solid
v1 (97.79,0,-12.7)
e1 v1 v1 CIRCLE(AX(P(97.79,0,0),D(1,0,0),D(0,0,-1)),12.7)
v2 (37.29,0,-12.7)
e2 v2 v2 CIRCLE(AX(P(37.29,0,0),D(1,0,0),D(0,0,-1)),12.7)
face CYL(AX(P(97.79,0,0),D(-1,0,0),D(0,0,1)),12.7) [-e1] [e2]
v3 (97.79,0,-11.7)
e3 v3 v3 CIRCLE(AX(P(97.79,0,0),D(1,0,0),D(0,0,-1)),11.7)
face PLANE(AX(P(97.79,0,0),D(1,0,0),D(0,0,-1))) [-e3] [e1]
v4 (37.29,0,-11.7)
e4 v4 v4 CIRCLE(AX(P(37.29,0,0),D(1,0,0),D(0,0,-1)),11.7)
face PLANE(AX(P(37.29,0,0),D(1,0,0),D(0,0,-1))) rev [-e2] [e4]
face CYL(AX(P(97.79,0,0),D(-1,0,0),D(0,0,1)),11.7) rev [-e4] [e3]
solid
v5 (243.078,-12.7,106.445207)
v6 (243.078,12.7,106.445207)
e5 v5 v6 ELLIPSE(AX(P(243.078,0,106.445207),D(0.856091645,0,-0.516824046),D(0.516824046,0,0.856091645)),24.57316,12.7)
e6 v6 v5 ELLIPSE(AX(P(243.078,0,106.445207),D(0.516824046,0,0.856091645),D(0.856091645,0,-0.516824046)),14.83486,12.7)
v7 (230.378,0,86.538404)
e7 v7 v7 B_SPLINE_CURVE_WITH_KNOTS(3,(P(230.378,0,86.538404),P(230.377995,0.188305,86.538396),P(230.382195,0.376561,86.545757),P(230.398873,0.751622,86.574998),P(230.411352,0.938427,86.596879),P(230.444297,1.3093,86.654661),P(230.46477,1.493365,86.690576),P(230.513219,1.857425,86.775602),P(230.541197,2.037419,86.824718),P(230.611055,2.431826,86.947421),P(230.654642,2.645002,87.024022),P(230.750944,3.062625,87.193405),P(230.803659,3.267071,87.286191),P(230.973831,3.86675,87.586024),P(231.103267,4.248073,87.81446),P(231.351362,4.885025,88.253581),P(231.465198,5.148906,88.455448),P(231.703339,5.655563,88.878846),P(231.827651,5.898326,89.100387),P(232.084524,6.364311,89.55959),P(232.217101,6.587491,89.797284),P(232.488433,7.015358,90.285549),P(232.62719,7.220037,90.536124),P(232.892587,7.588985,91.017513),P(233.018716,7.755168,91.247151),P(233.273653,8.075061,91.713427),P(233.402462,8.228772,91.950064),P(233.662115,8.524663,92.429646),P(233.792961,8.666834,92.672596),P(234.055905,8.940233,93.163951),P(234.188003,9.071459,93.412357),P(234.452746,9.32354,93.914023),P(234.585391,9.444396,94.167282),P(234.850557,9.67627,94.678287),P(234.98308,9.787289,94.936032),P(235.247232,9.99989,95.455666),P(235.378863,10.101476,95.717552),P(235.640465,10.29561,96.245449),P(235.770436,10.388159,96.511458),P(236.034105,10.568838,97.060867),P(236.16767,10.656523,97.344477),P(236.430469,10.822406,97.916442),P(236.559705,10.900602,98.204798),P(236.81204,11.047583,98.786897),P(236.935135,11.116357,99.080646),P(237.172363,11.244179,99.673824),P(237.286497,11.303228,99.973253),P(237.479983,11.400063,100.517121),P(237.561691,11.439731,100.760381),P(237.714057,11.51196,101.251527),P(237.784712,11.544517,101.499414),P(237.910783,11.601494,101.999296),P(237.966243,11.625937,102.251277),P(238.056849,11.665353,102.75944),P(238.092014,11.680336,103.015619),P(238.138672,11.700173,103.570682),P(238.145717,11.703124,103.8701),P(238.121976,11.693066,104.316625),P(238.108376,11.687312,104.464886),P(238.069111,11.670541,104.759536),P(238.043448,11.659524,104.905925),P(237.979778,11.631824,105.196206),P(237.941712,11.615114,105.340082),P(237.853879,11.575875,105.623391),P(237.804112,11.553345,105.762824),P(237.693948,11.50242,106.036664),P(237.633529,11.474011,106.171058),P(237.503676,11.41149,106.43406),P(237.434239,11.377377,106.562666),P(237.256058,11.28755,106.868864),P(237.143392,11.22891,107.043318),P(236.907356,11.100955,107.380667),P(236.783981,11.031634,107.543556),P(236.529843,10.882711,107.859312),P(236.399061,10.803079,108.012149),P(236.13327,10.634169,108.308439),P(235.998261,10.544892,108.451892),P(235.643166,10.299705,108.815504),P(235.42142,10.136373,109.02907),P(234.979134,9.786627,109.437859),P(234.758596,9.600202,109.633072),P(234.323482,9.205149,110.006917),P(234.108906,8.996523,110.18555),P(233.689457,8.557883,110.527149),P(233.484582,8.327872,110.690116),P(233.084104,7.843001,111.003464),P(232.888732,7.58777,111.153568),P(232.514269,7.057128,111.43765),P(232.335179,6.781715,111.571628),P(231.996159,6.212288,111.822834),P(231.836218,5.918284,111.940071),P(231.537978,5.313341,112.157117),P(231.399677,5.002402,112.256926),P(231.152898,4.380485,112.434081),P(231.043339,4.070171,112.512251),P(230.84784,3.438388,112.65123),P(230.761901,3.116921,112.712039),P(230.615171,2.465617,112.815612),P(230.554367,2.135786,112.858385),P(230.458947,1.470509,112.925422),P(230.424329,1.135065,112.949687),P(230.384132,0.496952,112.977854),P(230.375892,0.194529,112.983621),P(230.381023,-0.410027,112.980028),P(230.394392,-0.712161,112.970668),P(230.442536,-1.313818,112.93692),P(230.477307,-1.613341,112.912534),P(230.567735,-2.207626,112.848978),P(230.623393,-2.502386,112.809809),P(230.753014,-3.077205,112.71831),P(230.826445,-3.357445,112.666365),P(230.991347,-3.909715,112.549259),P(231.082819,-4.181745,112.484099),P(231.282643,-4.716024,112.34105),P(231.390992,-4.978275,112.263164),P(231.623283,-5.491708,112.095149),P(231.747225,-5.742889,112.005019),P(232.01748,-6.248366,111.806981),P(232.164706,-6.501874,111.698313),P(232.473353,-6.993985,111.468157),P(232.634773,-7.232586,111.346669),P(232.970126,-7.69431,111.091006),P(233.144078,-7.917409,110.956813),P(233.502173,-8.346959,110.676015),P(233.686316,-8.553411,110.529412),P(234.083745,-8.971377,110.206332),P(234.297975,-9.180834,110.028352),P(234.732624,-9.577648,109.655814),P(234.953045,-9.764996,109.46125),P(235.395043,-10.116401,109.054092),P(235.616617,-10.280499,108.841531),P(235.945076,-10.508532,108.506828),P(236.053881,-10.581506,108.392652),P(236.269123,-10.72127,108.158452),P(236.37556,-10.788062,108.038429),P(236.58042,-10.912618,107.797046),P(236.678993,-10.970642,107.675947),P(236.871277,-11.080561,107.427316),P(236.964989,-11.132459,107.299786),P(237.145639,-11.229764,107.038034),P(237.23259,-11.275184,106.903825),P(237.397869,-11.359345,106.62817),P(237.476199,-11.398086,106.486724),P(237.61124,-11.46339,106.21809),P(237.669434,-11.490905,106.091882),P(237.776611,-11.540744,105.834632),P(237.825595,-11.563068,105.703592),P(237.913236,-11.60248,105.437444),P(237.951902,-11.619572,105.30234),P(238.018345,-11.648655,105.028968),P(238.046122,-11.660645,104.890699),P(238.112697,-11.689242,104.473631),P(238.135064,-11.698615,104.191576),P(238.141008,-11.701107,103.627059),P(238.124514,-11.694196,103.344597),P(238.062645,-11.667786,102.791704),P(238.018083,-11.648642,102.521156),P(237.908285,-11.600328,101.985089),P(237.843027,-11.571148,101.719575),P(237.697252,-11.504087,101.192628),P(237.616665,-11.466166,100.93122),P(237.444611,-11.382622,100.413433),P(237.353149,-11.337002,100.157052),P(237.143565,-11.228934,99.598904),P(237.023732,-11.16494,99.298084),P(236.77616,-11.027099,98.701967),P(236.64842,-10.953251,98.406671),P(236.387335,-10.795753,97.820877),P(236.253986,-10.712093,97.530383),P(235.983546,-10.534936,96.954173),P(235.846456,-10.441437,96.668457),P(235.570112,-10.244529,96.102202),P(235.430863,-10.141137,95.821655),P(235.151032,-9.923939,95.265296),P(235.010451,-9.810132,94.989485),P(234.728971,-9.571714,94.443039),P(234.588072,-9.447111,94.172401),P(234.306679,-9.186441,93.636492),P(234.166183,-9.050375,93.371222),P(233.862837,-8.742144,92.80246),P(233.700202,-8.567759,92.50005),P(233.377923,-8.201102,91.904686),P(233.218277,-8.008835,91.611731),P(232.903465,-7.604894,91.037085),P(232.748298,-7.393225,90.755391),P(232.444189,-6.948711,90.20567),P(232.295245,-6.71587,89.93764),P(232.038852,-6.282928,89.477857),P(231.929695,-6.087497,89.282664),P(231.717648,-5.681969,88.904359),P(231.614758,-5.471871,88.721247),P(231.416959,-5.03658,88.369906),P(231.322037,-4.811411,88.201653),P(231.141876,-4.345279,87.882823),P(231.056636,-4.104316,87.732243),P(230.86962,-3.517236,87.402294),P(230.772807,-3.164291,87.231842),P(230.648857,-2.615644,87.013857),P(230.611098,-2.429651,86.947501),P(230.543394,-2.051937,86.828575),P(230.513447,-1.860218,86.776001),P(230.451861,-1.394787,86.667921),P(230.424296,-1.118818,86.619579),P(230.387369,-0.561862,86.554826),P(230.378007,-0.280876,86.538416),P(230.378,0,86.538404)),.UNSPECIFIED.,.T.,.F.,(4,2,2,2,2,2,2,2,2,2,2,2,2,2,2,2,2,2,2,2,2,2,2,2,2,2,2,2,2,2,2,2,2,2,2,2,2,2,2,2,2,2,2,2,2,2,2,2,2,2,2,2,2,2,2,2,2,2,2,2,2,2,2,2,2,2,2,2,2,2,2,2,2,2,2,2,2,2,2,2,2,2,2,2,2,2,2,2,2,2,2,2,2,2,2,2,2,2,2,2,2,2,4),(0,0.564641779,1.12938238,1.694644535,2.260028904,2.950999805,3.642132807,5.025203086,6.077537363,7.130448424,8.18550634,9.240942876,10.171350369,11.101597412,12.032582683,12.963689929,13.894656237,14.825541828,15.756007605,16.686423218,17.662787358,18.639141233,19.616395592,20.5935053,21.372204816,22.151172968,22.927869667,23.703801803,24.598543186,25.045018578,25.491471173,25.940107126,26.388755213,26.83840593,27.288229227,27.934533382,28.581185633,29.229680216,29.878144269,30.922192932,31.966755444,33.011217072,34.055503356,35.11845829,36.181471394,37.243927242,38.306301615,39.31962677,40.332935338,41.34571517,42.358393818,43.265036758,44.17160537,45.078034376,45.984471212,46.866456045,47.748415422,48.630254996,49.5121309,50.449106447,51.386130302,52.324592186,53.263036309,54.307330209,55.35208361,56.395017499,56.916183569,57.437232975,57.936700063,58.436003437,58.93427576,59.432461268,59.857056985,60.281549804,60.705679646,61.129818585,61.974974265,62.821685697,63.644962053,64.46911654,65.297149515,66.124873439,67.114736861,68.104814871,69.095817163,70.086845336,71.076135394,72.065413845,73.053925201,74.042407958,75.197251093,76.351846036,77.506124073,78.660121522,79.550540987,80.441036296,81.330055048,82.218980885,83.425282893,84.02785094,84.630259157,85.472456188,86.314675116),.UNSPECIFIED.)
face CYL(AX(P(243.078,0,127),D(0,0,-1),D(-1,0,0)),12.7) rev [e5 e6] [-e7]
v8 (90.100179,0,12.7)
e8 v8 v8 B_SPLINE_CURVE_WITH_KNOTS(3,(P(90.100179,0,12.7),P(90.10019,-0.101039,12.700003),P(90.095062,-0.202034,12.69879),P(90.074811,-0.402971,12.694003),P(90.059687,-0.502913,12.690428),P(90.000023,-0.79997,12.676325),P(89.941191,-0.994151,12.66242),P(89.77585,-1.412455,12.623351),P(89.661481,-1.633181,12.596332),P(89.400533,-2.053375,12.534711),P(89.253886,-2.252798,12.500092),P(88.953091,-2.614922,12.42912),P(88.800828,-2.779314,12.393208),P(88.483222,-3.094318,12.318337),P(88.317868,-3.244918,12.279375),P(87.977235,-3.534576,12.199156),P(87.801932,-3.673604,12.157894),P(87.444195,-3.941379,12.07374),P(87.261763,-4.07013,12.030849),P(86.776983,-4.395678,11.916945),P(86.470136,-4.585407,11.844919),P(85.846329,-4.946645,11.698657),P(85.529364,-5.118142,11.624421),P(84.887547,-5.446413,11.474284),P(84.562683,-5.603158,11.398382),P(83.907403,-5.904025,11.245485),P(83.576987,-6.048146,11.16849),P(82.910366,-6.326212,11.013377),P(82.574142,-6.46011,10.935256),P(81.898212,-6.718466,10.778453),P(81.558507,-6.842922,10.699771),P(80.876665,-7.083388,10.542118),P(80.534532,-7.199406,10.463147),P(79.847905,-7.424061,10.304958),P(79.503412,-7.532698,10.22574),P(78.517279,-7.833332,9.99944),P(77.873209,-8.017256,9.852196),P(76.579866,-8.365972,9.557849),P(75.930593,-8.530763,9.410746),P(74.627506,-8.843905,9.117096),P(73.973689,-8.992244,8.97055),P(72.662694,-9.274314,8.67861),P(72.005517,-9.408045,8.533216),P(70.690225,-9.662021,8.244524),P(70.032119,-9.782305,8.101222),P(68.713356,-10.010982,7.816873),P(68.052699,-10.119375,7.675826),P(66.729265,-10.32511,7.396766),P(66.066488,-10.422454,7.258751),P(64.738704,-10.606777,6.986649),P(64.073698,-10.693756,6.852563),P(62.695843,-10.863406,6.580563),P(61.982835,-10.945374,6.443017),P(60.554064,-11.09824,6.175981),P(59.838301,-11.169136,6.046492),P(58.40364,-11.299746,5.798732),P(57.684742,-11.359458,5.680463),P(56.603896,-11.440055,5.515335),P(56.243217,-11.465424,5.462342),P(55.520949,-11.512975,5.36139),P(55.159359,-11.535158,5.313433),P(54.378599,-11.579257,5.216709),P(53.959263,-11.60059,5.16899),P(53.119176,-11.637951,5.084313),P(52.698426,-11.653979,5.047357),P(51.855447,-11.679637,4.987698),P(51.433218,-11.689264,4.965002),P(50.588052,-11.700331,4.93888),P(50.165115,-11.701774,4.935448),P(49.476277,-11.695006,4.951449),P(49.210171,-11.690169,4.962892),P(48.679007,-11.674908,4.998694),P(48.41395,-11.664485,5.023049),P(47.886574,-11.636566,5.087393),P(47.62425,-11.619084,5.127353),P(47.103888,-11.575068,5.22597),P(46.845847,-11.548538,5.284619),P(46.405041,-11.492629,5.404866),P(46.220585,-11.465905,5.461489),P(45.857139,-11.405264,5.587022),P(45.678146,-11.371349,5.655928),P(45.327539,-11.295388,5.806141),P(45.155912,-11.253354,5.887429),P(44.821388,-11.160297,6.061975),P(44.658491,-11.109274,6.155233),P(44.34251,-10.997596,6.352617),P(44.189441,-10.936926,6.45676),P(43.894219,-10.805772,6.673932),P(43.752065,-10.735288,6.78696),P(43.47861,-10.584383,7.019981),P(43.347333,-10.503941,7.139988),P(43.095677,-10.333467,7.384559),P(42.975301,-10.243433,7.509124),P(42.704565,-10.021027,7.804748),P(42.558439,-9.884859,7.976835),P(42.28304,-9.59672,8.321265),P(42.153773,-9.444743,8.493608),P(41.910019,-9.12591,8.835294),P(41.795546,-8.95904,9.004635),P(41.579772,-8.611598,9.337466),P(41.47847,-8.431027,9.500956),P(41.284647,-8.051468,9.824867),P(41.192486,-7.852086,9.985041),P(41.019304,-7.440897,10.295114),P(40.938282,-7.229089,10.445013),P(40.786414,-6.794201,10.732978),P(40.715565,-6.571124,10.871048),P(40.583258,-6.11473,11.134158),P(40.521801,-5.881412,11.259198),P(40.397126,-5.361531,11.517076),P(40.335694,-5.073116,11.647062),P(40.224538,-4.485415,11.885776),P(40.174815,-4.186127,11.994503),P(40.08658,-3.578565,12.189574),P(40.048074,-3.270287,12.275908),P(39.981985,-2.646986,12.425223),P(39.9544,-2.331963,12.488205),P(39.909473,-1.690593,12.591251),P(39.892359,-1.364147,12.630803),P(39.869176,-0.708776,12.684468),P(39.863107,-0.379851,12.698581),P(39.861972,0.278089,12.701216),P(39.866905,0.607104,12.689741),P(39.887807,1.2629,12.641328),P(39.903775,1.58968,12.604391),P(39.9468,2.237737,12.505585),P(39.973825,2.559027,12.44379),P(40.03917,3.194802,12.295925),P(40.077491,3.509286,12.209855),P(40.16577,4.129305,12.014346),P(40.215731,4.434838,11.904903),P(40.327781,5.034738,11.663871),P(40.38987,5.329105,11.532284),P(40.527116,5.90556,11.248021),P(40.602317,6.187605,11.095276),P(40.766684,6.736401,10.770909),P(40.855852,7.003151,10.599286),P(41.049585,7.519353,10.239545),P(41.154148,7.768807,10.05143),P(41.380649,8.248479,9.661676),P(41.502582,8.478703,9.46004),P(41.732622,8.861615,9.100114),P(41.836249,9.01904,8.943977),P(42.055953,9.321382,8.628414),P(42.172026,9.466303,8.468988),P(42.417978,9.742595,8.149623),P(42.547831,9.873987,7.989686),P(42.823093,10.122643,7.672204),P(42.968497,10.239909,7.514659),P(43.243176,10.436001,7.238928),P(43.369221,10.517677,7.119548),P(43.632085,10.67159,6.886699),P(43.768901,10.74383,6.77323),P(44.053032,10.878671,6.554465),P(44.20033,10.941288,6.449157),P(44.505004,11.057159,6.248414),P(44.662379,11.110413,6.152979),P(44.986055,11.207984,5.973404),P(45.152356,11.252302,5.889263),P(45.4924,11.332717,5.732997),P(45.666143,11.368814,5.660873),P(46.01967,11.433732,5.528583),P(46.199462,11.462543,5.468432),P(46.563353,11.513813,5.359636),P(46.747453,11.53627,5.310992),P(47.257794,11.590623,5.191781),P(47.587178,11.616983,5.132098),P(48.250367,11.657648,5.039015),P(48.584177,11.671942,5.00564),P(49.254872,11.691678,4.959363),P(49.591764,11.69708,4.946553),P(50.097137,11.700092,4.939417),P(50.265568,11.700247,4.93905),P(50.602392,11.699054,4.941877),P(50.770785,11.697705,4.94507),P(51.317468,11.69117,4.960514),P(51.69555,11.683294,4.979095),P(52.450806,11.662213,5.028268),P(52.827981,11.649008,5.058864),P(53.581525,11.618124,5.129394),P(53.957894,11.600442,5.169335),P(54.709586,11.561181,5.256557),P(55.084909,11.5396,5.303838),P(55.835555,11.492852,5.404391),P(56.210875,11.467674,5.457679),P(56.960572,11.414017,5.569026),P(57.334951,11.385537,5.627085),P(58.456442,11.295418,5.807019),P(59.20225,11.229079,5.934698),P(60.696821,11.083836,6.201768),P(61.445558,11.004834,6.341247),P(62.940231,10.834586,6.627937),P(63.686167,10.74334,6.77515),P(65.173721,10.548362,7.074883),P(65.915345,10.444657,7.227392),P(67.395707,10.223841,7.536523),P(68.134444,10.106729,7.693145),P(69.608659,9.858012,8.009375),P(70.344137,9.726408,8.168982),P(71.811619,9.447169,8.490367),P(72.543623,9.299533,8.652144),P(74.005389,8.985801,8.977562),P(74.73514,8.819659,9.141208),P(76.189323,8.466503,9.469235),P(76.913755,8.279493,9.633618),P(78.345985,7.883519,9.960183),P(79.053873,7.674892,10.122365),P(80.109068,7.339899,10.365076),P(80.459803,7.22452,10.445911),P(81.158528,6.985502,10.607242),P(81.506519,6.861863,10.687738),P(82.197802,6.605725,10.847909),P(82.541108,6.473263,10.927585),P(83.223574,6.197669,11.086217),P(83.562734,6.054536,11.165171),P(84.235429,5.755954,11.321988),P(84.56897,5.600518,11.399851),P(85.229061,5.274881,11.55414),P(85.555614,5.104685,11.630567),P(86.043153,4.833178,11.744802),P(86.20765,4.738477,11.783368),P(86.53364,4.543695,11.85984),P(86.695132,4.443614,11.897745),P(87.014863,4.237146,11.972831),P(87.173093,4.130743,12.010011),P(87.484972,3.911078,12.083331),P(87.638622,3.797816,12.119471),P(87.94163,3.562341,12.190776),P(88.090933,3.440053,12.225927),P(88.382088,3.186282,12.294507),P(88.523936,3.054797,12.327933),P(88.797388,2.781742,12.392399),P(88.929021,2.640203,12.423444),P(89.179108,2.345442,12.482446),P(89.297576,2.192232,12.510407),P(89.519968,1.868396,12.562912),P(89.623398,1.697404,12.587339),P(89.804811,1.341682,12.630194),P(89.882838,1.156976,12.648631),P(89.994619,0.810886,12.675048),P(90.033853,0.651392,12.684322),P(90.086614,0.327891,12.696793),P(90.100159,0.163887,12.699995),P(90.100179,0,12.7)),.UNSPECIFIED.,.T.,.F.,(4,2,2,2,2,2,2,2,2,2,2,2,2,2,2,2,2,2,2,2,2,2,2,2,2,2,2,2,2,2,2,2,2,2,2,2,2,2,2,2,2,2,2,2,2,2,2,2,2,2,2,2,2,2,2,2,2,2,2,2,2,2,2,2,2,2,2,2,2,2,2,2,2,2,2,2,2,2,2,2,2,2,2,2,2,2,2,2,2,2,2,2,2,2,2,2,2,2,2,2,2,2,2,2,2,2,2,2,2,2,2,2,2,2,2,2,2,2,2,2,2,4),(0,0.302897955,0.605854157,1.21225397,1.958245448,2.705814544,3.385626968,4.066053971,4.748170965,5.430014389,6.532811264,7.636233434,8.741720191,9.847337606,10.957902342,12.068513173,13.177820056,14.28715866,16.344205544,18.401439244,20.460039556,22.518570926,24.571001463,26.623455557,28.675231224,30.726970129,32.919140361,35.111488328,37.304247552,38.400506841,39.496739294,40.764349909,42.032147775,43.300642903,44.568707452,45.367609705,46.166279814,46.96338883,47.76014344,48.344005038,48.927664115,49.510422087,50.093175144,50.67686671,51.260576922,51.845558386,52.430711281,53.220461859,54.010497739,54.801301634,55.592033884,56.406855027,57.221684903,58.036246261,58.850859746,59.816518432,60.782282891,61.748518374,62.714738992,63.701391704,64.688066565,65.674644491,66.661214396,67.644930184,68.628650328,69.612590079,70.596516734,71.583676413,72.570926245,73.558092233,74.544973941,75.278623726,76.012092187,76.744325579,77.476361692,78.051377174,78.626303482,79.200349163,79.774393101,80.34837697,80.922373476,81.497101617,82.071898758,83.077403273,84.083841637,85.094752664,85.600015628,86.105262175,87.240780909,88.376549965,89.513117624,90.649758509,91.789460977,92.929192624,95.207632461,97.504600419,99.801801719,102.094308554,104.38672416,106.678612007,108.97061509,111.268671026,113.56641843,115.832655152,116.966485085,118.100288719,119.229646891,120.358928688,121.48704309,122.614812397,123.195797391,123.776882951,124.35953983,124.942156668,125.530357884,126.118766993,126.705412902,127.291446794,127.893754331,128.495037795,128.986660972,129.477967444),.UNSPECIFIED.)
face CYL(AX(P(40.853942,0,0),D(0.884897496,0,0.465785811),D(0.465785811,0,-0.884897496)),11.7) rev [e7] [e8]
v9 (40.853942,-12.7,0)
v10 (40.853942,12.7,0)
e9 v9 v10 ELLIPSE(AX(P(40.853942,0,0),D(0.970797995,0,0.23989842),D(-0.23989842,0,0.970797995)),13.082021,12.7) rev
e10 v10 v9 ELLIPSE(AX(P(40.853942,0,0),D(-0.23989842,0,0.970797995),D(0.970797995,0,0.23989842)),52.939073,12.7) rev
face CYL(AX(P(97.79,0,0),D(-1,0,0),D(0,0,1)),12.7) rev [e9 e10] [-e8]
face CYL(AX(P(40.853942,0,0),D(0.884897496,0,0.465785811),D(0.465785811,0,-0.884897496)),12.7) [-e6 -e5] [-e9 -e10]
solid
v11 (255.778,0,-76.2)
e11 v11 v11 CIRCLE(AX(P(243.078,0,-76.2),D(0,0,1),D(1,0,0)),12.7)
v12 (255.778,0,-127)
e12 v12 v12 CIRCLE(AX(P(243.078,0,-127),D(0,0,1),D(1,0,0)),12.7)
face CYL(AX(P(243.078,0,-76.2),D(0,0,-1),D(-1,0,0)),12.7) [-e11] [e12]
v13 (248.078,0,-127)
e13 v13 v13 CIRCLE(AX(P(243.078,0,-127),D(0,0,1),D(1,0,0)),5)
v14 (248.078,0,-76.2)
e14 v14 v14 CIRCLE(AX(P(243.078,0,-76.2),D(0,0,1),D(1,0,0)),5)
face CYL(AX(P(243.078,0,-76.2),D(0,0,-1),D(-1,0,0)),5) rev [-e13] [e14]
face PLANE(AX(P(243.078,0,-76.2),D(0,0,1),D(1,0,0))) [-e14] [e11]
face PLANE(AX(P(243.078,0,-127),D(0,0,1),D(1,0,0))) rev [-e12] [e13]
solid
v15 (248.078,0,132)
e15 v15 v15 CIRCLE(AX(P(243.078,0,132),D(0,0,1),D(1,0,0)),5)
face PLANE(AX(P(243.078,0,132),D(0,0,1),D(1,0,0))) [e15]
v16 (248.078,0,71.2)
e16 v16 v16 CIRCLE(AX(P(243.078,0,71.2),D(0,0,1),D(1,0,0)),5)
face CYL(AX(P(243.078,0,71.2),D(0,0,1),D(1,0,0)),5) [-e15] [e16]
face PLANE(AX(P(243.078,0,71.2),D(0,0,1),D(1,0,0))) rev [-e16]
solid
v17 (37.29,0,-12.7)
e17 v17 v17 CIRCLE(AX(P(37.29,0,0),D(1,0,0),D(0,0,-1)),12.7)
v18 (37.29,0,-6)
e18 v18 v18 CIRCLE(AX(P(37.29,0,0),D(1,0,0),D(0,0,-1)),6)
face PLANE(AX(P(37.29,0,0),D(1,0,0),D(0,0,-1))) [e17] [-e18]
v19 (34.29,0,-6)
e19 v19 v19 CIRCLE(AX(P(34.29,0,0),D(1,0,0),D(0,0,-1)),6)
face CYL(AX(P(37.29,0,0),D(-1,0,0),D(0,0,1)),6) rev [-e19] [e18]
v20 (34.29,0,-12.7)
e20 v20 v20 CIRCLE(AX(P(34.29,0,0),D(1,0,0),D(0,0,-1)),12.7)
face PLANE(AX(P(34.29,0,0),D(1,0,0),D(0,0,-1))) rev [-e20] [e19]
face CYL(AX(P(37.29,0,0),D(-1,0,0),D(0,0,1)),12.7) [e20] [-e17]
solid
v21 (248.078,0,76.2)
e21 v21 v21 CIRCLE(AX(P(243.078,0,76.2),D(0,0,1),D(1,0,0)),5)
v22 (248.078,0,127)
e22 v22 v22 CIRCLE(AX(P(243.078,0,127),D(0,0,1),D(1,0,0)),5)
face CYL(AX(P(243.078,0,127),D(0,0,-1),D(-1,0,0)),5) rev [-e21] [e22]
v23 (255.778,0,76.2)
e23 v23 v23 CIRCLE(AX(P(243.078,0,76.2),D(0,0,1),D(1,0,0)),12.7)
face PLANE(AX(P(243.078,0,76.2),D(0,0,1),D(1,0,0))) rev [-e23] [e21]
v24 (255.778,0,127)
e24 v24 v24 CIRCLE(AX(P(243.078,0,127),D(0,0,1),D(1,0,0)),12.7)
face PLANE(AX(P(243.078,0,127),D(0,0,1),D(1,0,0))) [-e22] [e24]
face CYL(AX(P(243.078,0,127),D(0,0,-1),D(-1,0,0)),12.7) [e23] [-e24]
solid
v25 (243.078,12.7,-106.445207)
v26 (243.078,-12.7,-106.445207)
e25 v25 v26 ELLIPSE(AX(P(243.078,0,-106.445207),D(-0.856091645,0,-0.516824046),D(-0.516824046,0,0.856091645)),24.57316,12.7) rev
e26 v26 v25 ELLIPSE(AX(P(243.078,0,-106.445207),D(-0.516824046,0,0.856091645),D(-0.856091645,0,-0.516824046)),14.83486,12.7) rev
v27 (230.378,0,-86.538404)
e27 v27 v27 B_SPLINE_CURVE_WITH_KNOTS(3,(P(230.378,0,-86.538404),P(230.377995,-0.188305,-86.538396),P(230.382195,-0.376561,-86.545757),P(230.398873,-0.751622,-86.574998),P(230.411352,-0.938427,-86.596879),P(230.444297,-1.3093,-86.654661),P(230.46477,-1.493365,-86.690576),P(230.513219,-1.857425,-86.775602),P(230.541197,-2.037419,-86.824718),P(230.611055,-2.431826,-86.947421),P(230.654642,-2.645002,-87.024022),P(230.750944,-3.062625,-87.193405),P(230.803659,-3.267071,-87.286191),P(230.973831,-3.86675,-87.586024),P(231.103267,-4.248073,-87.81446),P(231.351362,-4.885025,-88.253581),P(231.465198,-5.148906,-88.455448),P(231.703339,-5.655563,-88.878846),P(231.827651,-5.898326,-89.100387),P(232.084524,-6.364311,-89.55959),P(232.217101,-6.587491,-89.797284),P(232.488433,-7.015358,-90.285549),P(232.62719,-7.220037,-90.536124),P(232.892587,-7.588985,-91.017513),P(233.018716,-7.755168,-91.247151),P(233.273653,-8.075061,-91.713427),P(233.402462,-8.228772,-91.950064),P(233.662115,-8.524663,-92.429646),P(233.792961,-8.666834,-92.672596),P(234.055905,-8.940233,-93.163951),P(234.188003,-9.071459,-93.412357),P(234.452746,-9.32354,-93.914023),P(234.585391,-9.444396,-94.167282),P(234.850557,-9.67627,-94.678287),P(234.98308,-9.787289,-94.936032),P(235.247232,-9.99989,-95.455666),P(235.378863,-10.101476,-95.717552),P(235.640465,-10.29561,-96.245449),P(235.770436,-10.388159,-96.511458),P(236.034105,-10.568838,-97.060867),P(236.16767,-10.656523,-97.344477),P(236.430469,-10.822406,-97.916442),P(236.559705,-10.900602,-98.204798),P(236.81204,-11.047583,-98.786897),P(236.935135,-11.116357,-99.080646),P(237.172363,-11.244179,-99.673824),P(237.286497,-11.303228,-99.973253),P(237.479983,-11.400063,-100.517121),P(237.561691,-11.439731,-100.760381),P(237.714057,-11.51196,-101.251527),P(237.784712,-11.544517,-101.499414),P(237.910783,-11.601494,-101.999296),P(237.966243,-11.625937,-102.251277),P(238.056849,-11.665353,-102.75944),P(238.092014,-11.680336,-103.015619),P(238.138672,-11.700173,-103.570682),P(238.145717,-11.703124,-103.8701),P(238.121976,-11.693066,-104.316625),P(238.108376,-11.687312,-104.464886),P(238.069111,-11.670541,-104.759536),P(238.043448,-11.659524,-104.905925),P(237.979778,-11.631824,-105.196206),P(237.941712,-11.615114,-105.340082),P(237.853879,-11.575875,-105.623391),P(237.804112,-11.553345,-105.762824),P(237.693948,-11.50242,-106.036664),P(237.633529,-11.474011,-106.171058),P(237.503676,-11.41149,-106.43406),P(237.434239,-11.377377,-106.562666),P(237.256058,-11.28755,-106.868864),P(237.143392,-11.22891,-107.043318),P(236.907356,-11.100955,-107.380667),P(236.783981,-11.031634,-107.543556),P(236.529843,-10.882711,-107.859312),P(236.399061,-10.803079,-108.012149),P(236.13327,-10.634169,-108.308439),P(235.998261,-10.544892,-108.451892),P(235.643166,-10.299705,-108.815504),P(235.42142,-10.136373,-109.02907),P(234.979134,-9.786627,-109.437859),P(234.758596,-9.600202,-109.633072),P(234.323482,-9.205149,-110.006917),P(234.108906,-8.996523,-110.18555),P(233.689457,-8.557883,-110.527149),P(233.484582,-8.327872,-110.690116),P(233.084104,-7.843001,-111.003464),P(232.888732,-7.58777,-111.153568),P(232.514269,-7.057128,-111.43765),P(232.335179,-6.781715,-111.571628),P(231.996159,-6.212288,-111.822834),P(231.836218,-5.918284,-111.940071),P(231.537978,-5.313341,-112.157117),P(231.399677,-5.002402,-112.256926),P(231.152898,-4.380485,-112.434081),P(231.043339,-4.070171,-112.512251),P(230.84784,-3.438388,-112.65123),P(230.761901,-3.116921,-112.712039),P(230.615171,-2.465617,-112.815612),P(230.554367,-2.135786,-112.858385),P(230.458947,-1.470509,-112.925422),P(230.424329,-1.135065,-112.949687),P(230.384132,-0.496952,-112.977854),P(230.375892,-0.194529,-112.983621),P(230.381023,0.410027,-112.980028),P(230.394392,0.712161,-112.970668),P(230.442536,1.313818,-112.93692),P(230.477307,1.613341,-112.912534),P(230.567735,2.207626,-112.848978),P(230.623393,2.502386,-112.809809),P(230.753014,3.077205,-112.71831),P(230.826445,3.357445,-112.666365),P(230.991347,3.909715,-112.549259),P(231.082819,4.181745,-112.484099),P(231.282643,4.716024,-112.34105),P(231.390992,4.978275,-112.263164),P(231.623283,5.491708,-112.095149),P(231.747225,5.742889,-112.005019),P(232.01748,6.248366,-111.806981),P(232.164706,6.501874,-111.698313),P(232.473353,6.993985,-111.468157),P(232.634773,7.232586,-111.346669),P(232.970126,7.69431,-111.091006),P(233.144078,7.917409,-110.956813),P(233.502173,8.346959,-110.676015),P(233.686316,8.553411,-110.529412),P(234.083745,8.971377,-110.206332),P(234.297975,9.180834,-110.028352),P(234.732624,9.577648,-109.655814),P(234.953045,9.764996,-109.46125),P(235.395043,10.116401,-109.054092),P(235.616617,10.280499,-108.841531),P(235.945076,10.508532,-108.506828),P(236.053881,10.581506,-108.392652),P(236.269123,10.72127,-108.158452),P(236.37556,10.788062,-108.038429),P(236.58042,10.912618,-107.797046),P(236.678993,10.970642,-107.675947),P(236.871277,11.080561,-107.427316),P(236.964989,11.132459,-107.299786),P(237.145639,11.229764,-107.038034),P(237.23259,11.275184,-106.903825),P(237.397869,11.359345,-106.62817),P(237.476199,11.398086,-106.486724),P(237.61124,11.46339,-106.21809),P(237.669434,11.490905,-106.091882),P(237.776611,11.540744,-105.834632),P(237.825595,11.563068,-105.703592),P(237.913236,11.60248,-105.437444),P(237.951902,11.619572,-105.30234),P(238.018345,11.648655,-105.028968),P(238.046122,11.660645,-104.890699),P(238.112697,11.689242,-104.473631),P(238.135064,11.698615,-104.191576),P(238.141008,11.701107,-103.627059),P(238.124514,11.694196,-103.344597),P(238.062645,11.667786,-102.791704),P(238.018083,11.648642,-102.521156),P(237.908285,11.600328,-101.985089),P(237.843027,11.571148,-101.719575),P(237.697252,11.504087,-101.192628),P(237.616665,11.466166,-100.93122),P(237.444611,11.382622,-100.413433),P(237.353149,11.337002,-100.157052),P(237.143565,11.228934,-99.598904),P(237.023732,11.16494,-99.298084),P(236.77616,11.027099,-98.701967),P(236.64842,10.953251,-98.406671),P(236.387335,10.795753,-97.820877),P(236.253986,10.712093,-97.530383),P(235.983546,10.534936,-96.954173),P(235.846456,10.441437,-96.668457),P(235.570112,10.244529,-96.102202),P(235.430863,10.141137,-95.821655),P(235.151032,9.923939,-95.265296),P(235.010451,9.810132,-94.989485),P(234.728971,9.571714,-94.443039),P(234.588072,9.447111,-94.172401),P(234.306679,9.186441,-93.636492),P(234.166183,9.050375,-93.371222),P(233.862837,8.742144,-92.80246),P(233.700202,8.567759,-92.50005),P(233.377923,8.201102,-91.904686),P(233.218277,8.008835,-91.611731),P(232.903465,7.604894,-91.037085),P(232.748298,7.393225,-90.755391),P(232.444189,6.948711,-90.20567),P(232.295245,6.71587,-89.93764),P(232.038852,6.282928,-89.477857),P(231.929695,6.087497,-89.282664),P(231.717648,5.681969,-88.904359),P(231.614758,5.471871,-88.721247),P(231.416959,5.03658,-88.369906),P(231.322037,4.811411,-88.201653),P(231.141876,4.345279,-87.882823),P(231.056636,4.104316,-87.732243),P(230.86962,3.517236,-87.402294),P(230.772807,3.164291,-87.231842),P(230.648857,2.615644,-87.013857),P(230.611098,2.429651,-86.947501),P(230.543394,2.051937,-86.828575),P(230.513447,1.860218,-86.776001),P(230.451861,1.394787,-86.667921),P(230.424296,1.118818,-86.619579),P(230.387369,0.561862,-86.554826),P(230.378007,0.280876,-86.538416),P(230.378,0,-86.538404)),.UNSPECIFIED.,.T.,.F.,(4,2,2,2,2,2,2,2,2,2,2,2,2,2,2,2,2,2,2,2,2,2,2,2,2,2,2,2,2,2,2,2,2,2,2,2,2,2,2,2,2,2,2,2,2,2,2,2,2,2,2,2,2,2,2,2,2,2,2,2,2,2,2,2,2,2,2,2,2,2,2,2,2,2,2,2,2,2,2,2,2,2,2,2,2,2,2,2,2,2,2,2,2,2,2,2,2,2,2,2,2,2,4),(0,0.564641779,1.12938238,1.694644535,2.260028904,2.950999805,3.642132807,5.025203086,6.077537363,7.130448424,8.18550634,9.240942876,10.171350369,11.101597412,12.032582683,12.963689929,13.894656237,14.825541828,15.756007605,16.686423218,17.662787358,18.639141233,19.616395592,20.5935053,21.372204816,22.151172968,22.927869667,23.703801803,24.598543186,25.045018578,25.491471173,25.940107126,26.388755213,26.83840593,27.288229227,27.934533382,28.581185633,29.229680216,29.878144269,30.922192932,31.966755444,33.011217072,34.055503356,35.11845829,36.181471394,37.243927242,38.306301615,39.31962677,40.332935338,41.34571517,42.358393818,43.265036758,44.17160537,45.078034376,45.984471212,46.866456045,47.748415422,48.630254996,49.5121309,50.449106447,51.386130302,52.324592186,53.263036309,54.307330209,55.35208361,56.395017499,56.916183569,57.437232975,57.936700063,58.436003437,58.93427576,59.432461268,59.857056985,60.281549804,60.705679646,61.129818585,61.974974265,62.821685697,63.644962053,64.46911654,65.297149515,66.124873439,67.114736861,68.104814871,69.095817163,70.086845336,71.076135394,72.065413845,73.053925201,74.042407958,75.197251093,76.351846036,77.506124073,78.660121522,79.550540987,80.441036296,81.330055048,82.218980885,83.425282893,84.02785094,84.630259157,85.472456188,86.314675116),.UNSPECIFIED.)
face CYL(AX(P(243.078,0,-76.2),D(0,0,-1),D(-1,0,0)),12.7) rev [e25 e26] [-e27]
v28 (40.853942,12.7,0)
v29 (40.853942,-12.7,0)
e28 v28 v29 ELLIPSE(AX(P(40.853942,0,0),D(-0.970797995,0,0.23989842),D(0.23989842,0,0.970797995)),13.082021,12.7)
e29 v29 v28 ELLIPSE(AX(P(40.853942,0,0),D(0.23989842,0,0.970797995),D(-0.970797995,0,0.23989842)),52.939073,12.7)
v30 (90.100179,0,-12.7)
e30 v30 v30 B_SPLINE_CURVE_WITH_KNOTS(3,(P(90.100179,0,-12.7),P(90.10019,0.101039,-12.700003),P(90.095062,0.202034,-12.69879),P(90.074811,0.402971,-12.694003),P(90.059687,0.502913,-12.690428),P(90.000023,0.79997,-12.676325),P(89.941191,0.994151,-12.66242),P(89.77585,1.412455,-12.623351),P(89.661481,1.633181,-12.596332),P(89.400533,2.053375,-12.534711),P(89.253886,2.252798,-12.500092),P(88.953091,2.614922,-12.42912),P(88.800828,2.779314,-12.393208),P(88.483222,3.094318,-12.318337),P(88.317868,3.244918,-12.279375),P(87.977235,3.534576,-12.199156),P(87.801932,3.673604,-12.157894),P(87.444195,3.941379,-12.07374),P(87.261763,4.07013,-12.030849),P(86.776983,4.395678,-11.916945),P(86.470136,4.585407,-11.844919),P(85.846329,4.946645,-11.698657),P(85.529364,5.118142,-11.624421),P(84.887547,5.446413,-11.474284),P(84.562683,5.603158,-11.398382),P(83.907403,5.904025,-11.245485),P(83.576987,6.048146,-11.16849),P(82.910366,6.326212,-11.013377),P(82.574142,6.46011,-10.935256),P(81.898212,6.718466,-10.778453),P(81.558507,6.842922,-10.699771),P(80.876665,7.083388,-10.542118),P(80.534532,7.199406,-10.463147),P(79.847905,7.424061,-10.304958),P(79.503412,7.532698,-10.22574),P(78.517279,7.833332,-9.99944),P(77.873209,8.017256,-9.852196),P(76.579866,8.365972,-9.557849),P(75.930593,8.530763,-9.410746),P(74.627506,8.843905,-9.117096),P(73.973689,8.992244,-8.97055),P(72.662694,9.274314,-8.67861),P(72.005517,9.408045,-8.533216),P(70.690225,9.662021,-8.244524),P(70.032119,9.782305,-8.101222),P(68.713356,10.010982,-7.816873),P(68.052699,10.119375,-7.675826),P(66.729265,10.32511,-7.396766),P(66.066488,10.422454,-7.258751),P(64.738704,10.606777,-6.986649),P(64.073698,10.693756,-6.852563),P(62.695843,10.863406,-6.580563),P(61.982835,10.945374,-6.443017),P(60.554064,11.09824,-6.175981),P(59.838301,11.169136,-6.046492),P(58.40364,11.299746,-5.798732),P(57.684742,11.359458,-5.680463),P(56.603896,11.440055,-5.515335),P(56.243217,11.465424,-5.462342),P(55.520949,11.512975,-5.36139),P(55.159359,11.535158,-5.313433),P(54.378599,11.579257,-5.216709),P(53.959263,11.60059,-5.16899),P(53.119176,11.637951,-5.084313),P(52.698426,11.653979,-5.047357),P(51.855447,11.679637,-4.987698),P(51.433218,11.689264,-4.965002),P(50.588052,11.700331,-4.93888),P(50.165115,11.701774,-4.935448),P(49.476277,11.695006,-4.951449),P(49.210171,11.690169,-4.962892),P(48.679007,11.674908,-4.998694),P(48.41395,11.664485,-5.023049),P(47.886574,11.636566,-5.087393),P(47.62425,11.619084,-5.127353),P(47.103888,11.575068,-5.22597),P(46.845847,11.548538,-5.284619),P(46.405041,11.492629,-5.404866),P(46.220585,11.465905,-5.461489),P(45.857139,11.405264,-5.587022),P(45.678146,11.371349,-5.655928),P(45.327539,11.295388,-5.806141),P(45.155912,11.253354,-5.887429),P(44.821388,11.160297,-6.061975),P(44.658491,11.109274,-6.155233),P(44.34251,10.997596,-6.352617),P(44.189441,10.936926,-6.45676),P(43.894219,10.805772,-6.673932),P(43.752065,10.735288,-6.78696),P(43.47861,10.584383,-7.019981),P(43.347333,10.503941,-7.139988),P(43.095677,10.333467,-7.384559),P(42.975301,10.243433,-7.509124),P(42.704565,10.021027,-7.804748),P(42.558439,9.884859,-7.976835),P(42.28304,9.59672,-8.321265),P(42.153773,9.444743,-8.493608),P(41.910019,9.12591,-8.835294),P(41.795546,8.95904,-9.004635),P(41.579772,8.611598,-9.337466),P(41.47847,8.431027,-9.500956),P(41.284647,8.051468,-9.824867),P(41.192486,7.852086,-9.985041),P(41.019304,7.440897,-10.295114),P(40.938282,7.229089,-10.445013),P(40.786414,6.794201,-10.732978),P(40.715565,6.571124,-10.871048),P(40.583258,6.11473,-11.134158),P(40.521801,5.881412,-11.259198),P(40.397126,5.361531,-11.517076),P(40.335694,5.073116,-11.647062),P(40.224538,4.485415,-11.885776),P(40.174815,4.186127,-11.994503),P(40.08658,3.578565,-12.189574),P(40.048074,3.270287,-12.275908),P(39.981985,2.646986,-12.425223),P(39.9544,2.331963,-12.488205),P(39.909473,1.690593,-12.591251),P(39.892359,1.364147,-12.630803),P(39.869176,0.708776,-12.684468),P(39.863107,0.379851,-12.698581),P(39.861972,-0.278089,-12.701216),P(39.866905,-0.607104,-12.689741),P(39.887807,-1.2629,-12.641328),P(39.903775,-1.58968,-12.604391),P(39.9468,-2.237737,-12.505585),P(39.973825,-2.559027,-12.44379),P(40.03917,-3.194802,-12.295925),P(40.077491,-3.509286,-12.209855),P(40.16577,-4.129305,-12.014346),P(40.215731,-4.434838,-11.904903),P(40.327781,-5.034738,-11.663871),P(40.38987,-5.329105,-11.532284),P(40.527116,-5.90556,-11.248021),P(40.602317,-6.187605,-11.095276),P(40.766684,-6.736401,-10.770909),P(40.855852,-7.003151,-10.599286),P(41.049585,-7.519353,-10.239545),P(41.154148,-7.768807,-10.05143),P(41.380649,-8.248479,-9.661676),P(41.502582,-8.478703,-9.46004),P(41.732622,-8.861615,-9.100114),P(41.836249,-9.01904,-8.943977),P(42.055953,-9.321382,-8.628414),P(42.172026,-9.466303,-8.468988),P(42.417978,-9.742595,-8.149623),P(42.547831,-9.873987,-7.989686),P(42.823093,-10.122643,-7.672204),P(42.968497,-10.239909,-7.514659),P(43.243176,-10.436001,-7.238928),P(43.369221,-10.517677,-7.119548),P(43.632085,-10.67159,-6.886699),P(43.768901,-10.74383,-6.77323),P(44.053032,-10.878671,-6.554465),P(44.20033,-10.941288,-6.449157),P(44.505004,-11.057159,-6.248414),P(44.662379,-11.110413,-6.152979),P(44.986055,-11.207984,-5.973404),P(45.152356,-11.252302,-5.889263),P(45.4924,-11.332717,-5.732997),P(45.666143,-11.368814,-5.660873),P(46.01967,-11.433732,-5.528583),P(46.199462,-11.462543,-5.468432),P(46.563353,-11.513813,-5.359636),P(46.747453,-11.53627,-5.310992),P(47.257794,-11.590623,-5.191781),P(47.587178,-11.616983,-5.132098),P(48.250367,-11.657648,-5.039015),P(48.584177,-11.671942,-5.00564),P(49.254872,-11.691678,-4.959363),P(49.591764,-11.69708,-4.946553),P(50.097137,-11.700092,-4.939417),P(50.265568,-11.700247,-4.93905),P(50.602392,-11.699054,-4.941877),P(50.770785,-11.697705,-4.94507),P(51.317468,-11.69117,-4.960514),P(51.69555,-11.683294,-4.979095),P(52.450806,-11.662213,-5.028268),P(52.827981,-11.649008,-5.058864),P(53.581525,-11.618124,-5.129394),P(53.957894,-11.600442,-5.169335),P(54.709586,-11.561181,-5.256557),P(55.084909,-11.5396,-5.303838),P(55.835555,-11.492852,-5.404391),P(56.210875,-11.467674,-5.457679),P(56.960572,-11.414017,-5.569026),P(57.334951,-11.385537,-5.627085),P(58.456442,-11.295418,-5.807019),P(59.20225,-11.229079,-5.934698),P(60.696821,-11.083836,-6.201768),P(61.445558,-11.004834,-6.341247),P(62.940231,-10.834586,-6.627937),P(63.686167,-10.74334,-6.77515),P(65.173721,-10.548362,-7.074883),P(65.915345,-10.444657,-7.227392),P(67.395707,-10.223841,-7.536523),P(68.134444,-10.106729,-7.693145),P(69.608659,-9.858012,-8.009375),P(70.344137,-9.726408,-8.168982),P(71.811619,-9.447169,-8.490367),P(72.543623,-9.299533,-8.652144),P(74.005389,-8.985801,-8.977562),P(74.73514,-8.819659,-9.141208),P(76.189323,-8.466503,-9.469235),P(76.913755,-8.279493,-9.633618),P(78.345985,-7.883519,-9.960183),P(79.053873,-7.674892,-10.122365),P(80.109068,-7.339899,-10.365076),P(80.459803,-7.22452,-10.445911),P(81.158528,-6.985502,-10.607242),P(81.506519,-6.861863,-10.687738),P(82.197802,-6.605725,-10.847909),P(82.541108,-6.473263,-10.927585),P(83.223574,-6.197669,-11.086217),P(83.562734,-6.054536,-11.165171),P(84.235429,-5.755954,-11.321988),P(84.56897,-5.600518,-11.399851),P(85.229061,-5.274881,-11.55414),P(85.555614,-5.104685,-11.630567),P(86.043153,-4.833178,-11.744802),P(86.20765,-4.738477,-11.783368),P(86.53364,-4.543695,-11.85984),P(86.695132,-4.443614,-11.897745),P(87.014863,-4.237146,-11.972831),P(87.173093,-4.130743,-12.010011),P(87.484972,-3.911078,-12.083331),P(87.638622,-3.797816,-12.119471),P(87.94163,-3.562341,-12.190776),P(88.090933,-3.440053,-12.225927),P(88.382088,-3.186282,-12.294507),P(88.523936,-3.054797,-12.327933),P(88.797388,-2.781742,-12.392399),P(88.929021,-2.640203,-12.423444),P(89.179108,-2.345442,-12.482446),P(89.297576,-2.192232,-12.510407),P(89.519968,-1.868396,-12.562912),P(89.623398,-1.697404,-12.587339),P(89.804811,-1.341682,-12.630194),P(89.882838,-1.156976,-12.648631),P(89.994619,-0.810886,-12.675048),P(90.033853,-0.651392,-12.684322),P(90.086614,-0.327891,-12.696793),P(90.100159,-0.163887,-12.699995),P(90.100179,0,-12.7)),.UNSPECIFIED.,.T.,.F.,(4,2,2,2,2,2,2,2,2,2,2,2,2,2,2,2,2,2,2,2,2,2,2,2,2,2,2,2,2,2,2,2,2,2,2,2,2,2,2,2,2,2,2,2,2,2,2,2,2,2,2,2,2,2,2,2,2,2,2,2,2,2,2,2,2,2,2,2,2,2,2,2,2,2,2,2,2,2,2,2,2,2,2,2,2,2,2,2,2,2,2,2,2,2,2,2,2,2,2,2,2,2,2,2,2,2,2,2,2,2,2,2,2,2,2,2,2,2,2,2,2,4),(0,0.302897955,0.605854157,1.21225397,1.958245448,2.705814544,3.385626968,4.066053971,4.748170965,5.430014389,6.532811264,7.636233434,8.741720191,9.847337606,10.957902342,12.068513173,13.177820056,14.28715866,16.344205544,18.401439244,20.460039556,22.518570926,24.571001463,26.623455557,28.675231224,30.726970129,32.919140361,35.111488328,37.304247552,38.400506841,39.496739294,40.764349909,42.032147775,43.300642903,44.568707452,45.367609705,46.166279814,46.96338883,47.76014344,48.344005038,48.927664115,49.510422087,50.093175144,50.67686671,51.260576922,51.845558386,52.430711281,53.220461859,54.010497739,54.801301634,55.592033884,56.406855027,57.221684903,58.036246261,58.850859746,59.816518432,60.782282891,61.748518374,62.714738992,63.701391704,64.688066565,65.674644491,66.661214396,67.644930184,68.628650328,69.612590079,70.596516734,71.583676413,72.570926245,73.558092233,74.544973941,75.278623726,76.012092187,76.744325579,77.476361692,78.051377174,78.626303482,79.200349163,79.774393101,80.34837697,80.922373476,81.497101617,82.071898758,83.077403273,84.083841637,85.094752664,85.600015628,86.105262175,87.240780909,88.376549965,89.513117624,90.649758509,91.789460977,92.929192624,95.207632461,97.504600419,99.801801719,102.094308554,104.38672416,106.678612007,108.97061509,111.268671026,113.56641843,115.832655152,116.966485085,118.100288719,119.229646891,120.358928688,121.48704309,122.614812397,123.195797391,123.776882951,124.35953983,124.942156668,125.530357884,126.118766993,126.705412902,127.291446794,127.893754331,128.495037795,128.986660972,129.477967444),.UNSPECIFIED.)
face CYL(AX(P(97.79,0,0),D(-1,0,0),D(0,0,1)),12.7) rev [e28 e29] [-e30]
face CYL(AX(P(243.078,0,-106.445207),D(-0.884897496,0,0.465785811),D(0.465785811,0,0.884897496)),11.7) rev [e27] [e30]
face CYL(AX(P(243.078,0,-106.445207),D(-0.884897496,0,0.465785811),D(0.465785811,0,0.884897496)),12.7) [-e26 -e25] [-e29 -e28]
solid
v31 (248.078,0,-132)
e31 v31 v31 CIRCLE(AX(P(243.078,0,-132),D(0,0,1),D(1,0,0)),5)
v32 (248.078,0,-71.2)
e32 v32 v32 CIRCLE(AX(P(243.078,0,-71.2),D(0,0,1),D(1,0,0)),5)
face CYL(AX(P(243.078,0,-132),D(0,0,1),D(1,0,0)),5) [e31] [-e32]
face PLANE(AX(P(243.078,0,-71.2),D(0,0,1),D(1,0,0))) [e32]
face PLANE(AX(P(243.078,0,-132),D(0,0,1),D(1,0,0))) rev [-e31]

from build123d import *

# Parameters (mm, degrees)
ONEINCH_START                          = 87.544697124
ONEINCH_PIPE_ONE_INCH_1_OUTLINE_R      = 12.7
ONEINCH_PIPE_ONE_INCH_1_OUTLINE_R_2    = 11.7
ONEINCH_PIPE_ONE_INCH_1_DEPTH          = 156.098206181
ONEINCH_START_2                        = 36.151550895
ONEINCH_PIPE_ONE_INCH_1_2_OUTLINE_R    = 12.7
ONEINCH_PIPE_ONE_INCH_1_2_OUTLINE_R_2  = 11.7
ONEINCH_PIPE_ONE_INCH_1_2_DEPTH        = 228.528229631
ONEINCH_START_3                        = -11.238198245
ONEINCH_PIPE_ONE_INCH_1_3_DEPTH        = 14.210948616
ONEINCH_START_4                        = 2.972750371
ONEINCH_PIPE_ONE_INCH_1_4_DEPTH        = 114.710654538
ONEINCH_START_5                        = 34.938462135
ONEINCH_PIPE_ONE_INCH_1_5_DEPTH        = 213.589231941
ONEINCH_PIPE_ONE_INCH_1_6_OUTLINE_R    = 12.7
ONEINCH_PIPE_ONE_INCH_1_6_OUTLINE_R_2  = 11.7
ONEINCH_PIPE_ONE_INCH_1_6_DEPTH        = 156.098206181
ONEINCH_PIPE_ONE_INCH_1_7_OUTLINE_R    = 12.7
ONEINCH_PIPE_ONE_INCH_1_7_OUTLINE_R_2  = 11.7
ONEINCH_PIPE_ONE_INCH_1_7_DEPTH        = 228.528229631
ONEINCH_START_6                        = -2.972750371
ONEINCH_PIPE_ONE_INCH_1_8_DEPTH        = 14.210948616
ONEINCH_START_7                        = -117.683404909
ONEINCH_PIPE_ONE_INCH_1_9_DEPTH        = 114.710654538
ONEINCH_PIPE_ONE_INCH_1_10_DEPTH       = 213.589231941
ONEINCH_START_8                        = 37.29
ONEINCH_PIPE_ONE_INCH_1_11_OUTLINE_R   = 12.7
ONEINCH_PIPE_ONE_INCH_1_11_OUTLINE_R_2 = 11.7
ONEINCH_PIPE_ONE_INCH_1_11_DEPTH       = 60.5
ONEINCH_START_9                        = 76.2
ONEINCH_PIPE_ONE_INCH_1_12_OUTLINE_R   = 12.7
ONEINCH_PIPE_ONE_INCH_1_12_OUTLINE_R_2 = 11.7
ONEINCH_PIPE_ONE_INCH_1_12_DEPTH       = 50.8
ONEINCH_START_10                       = -127
ONEINCH_PIPE_ONE_INCH_1_13_OUTLINE_R   = 12.7
ONEINCH_PIPE_ONE_INCH_1_13_OUTLINE_R_2 = 11.7
ONEINCH_PIPE_ONE_INCH_1_13_DEPTH       = 50.8
SKETCH16_R                             = 12.7
SKETCH16_R_2                           = 6
WASHERS_ONEINCHDIA12MM_1_DEPTH         = 3
SKETCH110_R                            = 12.7
SKETCH110_R_2                          = 5
SUSPENSIONMOUNT_BUSHING10MM_1_DEPTH    = 50.8
SKETCH110_ON_SEGMENT_2_R               = 12.7
SKETCH110_ON_SEGMENT_2_R_2             = 5
SUSPENSIONMOUNT_BUSHING10MM_1_2_DEPTH  = 50.8
BOSS_EXTRUDE1_DEPTH                    = 5
BOSS_EXTRUDE1_DEPTH_BACK               = 55.8
SKETCH112_R                            = 5
BOSS_EXTRUDE2_DEPTH                    = 5
BOSS_EXTRUDE2_DEPTH_BACK               = 55.8
SKETCH111_R                            = 5


with BuildPart() as part:
    # Oneinch PIPE_ONE_INCH(1): read off the stored shape, not the designer's step
    # Oneinch PIPE_ONE_INCH(1) outline → Oneinch PIPE_ONE_INCH(1) (new body)
    with BuildSketch(Plane(origin=(0, 0, 0), x_dir=(0.4657858109212566, 0, -0.8848974959533038), z_dir=(0.8848974959533038, 0, 0.46578581092125687)).offset(ONEINCH_START)):
        with Locations((19.029186514, 0)):
            Circle(ONEINCH_PIPE_ONE_INCH_1_OUTLINE_R)
        with Locations((19.029186514, 0)):
            Circle(ONEINCH_PIPE_ONE_INCH_1_OUTLINE_R_2, mode=Mode.SUBTRACT)
    extrude(amount=ONEINCH_PIPE_ONE_INCH_1_DEPTH)

    # Oneinch PIPE_ONE_INCH_1 2 outline → Oneinch PIPE_ONE_INCH_1 2 (add)
    with BuildSketch(Plane(origin=(0, 0, 0), x_dir=(0.4657858109212566, 0, -0.8848974959533038), z_dir=(0.8848974959533038, 0, 0.46578581092125687)).offset(ONEINCH_START_2)):
        with Locations((19.029186514, 0)):
            Circle(ONEINCH_PIPE_ONE_INCH_1_2_OUTLINE_R)
        with Locations((19.029186514, 0)):
            Circle(ONEINCH_PIPE_ONE_INCH_1_2_OUTLINE_R_2, mode=Mode.SUBTRACT)
    extrude(amount=ONEINCH_PIPE_ONE_INCH_1_2_DEPTH)

    # Oneinch PIPE_ONE_INCH_1 3 outline → Oneinch PIPE_ONE_INCH_1 3 (cut)
    with BuildSketch(Plane.XY.offset(ONEINCH_START_3)):
        with BuildLine():
            Line((250, -12.7), (243.078, -12.7))
            ThreePointArc((243.078, -12.7), (230.378, 0), (243.078, 12.7))
            Line((243.078, 12.7), (250, 12.7))
            Line((250, 12.7), (250, 14))
            Line((250, 14), (65, 14))
            Line((65, 14), (65, -14))
            Line((65, -14), (250, -14))
            Line((250, -14), (250, -12.7))
        make_face()
    extrude(amount=ONEINCH_PIPE_ONE_INCH_1_3_DEPTH, mode=Mode.SUBTRACT)

    # Oneinch PIPE_ONE_INCH_1 4 outline → Oneinch PIPE_ONE_INCH_1 4 (cut)
    with BuildSketch(Plane.XY.offset(ONEINCH_START_4)):
        with BuildLine():
            ThreePointArc((243.078, 12.7), (230.378, 0), (243.078, -12.7))
            Line((243.078, -12.7), (250, -12.7))
            Line((250, -12.7), (250, 12.7))
            Line((250, 12.7), (243.078, 12.7))
        make_face()
    extrude(amount=ONEINCH_PIPE_ONE_INCH_1_4_DEPTH, mode=Mode.SUBTRACT)

    # Oneinch PIPE_ONE_INCH_1 5 outline → Oneinch PIPE_ONE_INCH_1 5 (cut)
    with BuildSketch(Plane.YZ.offset(ONEINCH_START_5)):
        with BuildLine():
            ThreePointArc((12.7, 0), (0, 12.7), (-12.7, 0))
            Line((-12.7, 0), (-12.7, -13))
            Line((-12.7, -13), (12.7, -13))
            Line((12.7, -13), (12.7, 0))
        make_face()
    extrude(amount=ONEINCH_PIPE_ONE_INCH_1_5_DEPTH, mode=Mode.SUBTRACT)


with BuildPart() as body_2:
    # Oneinch PIPE_ONE_INCH_1 6 outline → Oneinch PIPE_ONE_INCH_1 6 (new body)
    with BuildSketch(Plane(origin=(0, 0, 0), x_dir=(0.4657858109212566, 0, 0.8848974959533038), z_dir=(0.8848974959533038, 0, -0.46578581092125687)).offset(ONEINCH_START)):
        with Locations((19.029186514, 0)):
            Circle(ONEINCH_PIPE_ONE_INCH_1_6_OUTLINE_R)
        with Locations((19.029186514, 0)):
            Circle(ONEINCH_PIPE_ONE_INCH_1_6_OUTLINE_R_2, mode=Mode.SUBTRACT)
    extrude(amount=ONEINCH_PIPE_ONE_INCH_1_6_DEPTH)

    # Oneinch PIPE_ONE_INCH_1 7 outline → Oneinch PIPE_ONE_INCH_1 7 (add)
    with BuildSketch(Plane(origin=(0, 0, 0), x_dir=(0.4657858109212566, 0, 0.8848974959533038), z_dir=(0.8848974959533038, 0, -0.46578581092125687)).offset(ONEINCH_START_2)):
        with Locations((19.029186514, 0)):
            Circle(ONEINCH_PIPE_ONE_INCH_1_7_OUTLINE_R)
        with Locations((19.029186514, 0)):
            Circle(ONEINCH_PIPE_ONE_INCH_1_7_OUTLINE_R_2, mode=Mode.SUBTRACT)
    extrude(amount=ONEINCH_PIPE_ONE_INCH_1_7_DEPTH)

    # Oneinch PIPE_ONE_INCH_1 8 outline → Oneinch PIPE_ONE_INCH_1 8 (cut)
    with BuildSketch(Plane.XY.offset(ONEINCH_START_6)):
        with BuildLine():
            Line((250, -12.7), (243.078, -12.7))
            ThreePointArc((243.078, -12.7), (230.378, 0), (243.078, 12.7))
            Line((243.078, 12.7), (250, 12.7))
            Line((250, 12.7), (250, 14))
            Line((250, 14), (65, 14))
            Line((65, 14), (65, -14))
            Line((65, -14), (250, -14))
            Line((250, -14), (250, -12.7))
        make_face()
    extrude(amount=ONEINCH_PIPE_ONE_INCH_1_8_DEPTH, mode=Mode.SUBTRACT)

    # Oneinch PIPE_ONE_INCH_1 9 outline → Oneinch PIPE_ONE_INCH_1 9 (cut)
    with BuildSketch(Plane.XY.offset(ONEINCH_START_7)):
        with BuildLine():
            ThreePointArc((243.078, 12.7), (230.378, 0), (243.078, -12.7))
            Line((243.078, -12.7), (250, -12.7))
            Line((250, -12.7), (250, 12.7))
            Line((250, 12.7), (243.078, 12.7))
        make_face()
    extrude(amount=ONEINCH_PIPE_ONE_INCH_1_9_DEPTH, mode=Mode.SUBTRACT)

    # Oneinch PIPE_ONE_INCH_1 10 outline → Oneinch PIPE_ONE_INCH_1 10 (cut)
    with BuildSketch(Plane.YZ.offset(ONEINCH_START_5)):
        with BuildLine():
            ThreePointArc((-12.7, 0), (0, -12.7), (12.7, 0))
            Line((12.7, 0), (12.7, 13))
            Line((12.7, 13), (-12.7, 13))
            Line((-12.7, 13), (-12.7, 0))
        make_face()
    extrude(amount=ONEINCH_PIPE_ONE_INCH_1_10_DEPTH, mode=Mode.SUBTRACT)


with BuildPart() as body_3:
    # Oneinch PIPE_ONE_INCH_1 11 outline → Oneinch PIPE_ONE_INCH_1 11 (new body)
    with BuildSketch(Plane.YZ.offset(ONEINCH_START_8)):
        Circle(ONEINCH_PIPE_ONE_INCH_1_11_OUTLINE_R)
        Circle(ONEINCH_PIPE_ONE_INCH_1_11_OUTLINE_R_2, mode=Mode.SUBTRACT)
    extrude(amount=ONEINCH_PIPE_ONE_INCH_1_11_DEPTH)


with BuildPart() as body_4:
    # Oneinch PIPE_ONE_INCH_1 12 outline → Oneinch PIPE_ONE_INCH_1 12 (new body)
    with BuildSketch(Plane.XY.offset(ONEINCH_START_9)):
        with Locations((243.078, 0)):
            Circle(ONEINCH_PIPE_ONE_INCH_1_12_OUTLINE_R)
        with Locations((243.078, 0)):
            Circle(ONEINCH_PIPE_ONE_INCH_1_12_OUTLINE_R_2, mode=Mode.SUBTRACT)
    extrude(amount=ONEINCH_PIPE_ONE_INCH_1_12_DEPTH)


with BuildPart() as body_5:
    # Oneinch PIPE_ONE_INCH_1 13 outline → Oneinch PIPE_ONE_INCH_1 13 (new body)
    with BuildSketch(Plane.XY.offset(ONEINCH_START_10)):
        with Locations((243.078, 0)):
            Circle(ONEINCH_PIPE_ONE_INCH_1_13_OUTLINE_R)
        with Locations((243.078, 0)):
            Circle(ONEINCH_PIPE_ONE_INCH_1_13_OUTLINE_R_2, mode=Mode.SUBTRACT)
    extrude(amount=ONEINCH_PIPE_ONE_INCH_1_13_DEPTH)


with BuildPart() as body_6:
    # Sketch16 → Washers ONEINCHDIA12MM(1) (new body)
    with BuildSketch(Plane(origin=(34.29, 0, 0), x_dir=(0, 0, -1), z_dir=(1, 0, 0))):
        Circle(SKETCH16_R)
        Circle(SKETCH16_R_2, mode=Mode.SUBTRACT)
    extrude(amount=WASHERS_ONEINCHDIA12MM_1_DEPTH)


with BuildPart() as body_5_2:
    # Sketch110 → Suspensionmount BUSHING10MM(1) (new body)
    with BuildSketch(Plane(origin=(243.078, 0, -127), x_dir=(1, 0, 0), z_dir=(0, 0, 1))):
        Circle(SKETCH110_R)
        Circle(SKETCH110_R_2, mode=Mode.SUBTRACT)
    extrude(amount=SUSPENSIONMOUNT_BUSHING10MM_1_DEPTH)


with BuildPart() as body_6_2:
    # Sketch110 on segment 2 (carried to segment 2) → Suspensionmount BUSHING10MM_1 2 (new body)
    with BuildSketch(Plane(origin=(243.078, 0, 76.2), x_dir=(1, 0, 0), z_dir=(0, 0, 1))):
        Circle(SKETCH110_ON_SEGMENT_2_R)
        Circle(SKETCH110_ON_SEGMENT_2_R_2, mode=Mode.SUBTRACT)
    extrude(amount=SUSPENSIONMOUNT_BUSHING10MM_1_2_DEPTH)


with BuildPart() as body_7:
    # Sketch112 → Boss-Extrude1 (new, two sides: drawn at the far end of the back side and taken through both)
    with BuildSketch(Plane.XY.offset(127).offset(-BOSS_EXTRUDE1_DEPTH_BACK)):
        with Locations((243.078, 0)):
            Circle(SKETCH112_R)
    extrude(amount=BOSS_EXTRUDE1_DEPTH + BOSS_EXTRUDE1_DEPTH_BACK)


with BuildPart() as body_8:
    # Sketch111 → Boss-Extrude2 (new, two sides: drawn at the far end of the back side and taken through both)
    with BuildSketch(Plane.XY.offset(-76.2).offset(-BOSS_EXTRUDE2_DEPTH_BACK)):
        with Locations((243.078, 0)):
            Circle(SKETCH111_R)
    extrude(amount=BOSS_EXTRUDE2_DEPTH + BOSS_EXTRUDE2_DEPTH_BACK)


solid = Compound([part.part, body_2.part, body_3.part, body_6.part, body_5_2.part, body_6_2.part, body_7.part, body_8.part])
